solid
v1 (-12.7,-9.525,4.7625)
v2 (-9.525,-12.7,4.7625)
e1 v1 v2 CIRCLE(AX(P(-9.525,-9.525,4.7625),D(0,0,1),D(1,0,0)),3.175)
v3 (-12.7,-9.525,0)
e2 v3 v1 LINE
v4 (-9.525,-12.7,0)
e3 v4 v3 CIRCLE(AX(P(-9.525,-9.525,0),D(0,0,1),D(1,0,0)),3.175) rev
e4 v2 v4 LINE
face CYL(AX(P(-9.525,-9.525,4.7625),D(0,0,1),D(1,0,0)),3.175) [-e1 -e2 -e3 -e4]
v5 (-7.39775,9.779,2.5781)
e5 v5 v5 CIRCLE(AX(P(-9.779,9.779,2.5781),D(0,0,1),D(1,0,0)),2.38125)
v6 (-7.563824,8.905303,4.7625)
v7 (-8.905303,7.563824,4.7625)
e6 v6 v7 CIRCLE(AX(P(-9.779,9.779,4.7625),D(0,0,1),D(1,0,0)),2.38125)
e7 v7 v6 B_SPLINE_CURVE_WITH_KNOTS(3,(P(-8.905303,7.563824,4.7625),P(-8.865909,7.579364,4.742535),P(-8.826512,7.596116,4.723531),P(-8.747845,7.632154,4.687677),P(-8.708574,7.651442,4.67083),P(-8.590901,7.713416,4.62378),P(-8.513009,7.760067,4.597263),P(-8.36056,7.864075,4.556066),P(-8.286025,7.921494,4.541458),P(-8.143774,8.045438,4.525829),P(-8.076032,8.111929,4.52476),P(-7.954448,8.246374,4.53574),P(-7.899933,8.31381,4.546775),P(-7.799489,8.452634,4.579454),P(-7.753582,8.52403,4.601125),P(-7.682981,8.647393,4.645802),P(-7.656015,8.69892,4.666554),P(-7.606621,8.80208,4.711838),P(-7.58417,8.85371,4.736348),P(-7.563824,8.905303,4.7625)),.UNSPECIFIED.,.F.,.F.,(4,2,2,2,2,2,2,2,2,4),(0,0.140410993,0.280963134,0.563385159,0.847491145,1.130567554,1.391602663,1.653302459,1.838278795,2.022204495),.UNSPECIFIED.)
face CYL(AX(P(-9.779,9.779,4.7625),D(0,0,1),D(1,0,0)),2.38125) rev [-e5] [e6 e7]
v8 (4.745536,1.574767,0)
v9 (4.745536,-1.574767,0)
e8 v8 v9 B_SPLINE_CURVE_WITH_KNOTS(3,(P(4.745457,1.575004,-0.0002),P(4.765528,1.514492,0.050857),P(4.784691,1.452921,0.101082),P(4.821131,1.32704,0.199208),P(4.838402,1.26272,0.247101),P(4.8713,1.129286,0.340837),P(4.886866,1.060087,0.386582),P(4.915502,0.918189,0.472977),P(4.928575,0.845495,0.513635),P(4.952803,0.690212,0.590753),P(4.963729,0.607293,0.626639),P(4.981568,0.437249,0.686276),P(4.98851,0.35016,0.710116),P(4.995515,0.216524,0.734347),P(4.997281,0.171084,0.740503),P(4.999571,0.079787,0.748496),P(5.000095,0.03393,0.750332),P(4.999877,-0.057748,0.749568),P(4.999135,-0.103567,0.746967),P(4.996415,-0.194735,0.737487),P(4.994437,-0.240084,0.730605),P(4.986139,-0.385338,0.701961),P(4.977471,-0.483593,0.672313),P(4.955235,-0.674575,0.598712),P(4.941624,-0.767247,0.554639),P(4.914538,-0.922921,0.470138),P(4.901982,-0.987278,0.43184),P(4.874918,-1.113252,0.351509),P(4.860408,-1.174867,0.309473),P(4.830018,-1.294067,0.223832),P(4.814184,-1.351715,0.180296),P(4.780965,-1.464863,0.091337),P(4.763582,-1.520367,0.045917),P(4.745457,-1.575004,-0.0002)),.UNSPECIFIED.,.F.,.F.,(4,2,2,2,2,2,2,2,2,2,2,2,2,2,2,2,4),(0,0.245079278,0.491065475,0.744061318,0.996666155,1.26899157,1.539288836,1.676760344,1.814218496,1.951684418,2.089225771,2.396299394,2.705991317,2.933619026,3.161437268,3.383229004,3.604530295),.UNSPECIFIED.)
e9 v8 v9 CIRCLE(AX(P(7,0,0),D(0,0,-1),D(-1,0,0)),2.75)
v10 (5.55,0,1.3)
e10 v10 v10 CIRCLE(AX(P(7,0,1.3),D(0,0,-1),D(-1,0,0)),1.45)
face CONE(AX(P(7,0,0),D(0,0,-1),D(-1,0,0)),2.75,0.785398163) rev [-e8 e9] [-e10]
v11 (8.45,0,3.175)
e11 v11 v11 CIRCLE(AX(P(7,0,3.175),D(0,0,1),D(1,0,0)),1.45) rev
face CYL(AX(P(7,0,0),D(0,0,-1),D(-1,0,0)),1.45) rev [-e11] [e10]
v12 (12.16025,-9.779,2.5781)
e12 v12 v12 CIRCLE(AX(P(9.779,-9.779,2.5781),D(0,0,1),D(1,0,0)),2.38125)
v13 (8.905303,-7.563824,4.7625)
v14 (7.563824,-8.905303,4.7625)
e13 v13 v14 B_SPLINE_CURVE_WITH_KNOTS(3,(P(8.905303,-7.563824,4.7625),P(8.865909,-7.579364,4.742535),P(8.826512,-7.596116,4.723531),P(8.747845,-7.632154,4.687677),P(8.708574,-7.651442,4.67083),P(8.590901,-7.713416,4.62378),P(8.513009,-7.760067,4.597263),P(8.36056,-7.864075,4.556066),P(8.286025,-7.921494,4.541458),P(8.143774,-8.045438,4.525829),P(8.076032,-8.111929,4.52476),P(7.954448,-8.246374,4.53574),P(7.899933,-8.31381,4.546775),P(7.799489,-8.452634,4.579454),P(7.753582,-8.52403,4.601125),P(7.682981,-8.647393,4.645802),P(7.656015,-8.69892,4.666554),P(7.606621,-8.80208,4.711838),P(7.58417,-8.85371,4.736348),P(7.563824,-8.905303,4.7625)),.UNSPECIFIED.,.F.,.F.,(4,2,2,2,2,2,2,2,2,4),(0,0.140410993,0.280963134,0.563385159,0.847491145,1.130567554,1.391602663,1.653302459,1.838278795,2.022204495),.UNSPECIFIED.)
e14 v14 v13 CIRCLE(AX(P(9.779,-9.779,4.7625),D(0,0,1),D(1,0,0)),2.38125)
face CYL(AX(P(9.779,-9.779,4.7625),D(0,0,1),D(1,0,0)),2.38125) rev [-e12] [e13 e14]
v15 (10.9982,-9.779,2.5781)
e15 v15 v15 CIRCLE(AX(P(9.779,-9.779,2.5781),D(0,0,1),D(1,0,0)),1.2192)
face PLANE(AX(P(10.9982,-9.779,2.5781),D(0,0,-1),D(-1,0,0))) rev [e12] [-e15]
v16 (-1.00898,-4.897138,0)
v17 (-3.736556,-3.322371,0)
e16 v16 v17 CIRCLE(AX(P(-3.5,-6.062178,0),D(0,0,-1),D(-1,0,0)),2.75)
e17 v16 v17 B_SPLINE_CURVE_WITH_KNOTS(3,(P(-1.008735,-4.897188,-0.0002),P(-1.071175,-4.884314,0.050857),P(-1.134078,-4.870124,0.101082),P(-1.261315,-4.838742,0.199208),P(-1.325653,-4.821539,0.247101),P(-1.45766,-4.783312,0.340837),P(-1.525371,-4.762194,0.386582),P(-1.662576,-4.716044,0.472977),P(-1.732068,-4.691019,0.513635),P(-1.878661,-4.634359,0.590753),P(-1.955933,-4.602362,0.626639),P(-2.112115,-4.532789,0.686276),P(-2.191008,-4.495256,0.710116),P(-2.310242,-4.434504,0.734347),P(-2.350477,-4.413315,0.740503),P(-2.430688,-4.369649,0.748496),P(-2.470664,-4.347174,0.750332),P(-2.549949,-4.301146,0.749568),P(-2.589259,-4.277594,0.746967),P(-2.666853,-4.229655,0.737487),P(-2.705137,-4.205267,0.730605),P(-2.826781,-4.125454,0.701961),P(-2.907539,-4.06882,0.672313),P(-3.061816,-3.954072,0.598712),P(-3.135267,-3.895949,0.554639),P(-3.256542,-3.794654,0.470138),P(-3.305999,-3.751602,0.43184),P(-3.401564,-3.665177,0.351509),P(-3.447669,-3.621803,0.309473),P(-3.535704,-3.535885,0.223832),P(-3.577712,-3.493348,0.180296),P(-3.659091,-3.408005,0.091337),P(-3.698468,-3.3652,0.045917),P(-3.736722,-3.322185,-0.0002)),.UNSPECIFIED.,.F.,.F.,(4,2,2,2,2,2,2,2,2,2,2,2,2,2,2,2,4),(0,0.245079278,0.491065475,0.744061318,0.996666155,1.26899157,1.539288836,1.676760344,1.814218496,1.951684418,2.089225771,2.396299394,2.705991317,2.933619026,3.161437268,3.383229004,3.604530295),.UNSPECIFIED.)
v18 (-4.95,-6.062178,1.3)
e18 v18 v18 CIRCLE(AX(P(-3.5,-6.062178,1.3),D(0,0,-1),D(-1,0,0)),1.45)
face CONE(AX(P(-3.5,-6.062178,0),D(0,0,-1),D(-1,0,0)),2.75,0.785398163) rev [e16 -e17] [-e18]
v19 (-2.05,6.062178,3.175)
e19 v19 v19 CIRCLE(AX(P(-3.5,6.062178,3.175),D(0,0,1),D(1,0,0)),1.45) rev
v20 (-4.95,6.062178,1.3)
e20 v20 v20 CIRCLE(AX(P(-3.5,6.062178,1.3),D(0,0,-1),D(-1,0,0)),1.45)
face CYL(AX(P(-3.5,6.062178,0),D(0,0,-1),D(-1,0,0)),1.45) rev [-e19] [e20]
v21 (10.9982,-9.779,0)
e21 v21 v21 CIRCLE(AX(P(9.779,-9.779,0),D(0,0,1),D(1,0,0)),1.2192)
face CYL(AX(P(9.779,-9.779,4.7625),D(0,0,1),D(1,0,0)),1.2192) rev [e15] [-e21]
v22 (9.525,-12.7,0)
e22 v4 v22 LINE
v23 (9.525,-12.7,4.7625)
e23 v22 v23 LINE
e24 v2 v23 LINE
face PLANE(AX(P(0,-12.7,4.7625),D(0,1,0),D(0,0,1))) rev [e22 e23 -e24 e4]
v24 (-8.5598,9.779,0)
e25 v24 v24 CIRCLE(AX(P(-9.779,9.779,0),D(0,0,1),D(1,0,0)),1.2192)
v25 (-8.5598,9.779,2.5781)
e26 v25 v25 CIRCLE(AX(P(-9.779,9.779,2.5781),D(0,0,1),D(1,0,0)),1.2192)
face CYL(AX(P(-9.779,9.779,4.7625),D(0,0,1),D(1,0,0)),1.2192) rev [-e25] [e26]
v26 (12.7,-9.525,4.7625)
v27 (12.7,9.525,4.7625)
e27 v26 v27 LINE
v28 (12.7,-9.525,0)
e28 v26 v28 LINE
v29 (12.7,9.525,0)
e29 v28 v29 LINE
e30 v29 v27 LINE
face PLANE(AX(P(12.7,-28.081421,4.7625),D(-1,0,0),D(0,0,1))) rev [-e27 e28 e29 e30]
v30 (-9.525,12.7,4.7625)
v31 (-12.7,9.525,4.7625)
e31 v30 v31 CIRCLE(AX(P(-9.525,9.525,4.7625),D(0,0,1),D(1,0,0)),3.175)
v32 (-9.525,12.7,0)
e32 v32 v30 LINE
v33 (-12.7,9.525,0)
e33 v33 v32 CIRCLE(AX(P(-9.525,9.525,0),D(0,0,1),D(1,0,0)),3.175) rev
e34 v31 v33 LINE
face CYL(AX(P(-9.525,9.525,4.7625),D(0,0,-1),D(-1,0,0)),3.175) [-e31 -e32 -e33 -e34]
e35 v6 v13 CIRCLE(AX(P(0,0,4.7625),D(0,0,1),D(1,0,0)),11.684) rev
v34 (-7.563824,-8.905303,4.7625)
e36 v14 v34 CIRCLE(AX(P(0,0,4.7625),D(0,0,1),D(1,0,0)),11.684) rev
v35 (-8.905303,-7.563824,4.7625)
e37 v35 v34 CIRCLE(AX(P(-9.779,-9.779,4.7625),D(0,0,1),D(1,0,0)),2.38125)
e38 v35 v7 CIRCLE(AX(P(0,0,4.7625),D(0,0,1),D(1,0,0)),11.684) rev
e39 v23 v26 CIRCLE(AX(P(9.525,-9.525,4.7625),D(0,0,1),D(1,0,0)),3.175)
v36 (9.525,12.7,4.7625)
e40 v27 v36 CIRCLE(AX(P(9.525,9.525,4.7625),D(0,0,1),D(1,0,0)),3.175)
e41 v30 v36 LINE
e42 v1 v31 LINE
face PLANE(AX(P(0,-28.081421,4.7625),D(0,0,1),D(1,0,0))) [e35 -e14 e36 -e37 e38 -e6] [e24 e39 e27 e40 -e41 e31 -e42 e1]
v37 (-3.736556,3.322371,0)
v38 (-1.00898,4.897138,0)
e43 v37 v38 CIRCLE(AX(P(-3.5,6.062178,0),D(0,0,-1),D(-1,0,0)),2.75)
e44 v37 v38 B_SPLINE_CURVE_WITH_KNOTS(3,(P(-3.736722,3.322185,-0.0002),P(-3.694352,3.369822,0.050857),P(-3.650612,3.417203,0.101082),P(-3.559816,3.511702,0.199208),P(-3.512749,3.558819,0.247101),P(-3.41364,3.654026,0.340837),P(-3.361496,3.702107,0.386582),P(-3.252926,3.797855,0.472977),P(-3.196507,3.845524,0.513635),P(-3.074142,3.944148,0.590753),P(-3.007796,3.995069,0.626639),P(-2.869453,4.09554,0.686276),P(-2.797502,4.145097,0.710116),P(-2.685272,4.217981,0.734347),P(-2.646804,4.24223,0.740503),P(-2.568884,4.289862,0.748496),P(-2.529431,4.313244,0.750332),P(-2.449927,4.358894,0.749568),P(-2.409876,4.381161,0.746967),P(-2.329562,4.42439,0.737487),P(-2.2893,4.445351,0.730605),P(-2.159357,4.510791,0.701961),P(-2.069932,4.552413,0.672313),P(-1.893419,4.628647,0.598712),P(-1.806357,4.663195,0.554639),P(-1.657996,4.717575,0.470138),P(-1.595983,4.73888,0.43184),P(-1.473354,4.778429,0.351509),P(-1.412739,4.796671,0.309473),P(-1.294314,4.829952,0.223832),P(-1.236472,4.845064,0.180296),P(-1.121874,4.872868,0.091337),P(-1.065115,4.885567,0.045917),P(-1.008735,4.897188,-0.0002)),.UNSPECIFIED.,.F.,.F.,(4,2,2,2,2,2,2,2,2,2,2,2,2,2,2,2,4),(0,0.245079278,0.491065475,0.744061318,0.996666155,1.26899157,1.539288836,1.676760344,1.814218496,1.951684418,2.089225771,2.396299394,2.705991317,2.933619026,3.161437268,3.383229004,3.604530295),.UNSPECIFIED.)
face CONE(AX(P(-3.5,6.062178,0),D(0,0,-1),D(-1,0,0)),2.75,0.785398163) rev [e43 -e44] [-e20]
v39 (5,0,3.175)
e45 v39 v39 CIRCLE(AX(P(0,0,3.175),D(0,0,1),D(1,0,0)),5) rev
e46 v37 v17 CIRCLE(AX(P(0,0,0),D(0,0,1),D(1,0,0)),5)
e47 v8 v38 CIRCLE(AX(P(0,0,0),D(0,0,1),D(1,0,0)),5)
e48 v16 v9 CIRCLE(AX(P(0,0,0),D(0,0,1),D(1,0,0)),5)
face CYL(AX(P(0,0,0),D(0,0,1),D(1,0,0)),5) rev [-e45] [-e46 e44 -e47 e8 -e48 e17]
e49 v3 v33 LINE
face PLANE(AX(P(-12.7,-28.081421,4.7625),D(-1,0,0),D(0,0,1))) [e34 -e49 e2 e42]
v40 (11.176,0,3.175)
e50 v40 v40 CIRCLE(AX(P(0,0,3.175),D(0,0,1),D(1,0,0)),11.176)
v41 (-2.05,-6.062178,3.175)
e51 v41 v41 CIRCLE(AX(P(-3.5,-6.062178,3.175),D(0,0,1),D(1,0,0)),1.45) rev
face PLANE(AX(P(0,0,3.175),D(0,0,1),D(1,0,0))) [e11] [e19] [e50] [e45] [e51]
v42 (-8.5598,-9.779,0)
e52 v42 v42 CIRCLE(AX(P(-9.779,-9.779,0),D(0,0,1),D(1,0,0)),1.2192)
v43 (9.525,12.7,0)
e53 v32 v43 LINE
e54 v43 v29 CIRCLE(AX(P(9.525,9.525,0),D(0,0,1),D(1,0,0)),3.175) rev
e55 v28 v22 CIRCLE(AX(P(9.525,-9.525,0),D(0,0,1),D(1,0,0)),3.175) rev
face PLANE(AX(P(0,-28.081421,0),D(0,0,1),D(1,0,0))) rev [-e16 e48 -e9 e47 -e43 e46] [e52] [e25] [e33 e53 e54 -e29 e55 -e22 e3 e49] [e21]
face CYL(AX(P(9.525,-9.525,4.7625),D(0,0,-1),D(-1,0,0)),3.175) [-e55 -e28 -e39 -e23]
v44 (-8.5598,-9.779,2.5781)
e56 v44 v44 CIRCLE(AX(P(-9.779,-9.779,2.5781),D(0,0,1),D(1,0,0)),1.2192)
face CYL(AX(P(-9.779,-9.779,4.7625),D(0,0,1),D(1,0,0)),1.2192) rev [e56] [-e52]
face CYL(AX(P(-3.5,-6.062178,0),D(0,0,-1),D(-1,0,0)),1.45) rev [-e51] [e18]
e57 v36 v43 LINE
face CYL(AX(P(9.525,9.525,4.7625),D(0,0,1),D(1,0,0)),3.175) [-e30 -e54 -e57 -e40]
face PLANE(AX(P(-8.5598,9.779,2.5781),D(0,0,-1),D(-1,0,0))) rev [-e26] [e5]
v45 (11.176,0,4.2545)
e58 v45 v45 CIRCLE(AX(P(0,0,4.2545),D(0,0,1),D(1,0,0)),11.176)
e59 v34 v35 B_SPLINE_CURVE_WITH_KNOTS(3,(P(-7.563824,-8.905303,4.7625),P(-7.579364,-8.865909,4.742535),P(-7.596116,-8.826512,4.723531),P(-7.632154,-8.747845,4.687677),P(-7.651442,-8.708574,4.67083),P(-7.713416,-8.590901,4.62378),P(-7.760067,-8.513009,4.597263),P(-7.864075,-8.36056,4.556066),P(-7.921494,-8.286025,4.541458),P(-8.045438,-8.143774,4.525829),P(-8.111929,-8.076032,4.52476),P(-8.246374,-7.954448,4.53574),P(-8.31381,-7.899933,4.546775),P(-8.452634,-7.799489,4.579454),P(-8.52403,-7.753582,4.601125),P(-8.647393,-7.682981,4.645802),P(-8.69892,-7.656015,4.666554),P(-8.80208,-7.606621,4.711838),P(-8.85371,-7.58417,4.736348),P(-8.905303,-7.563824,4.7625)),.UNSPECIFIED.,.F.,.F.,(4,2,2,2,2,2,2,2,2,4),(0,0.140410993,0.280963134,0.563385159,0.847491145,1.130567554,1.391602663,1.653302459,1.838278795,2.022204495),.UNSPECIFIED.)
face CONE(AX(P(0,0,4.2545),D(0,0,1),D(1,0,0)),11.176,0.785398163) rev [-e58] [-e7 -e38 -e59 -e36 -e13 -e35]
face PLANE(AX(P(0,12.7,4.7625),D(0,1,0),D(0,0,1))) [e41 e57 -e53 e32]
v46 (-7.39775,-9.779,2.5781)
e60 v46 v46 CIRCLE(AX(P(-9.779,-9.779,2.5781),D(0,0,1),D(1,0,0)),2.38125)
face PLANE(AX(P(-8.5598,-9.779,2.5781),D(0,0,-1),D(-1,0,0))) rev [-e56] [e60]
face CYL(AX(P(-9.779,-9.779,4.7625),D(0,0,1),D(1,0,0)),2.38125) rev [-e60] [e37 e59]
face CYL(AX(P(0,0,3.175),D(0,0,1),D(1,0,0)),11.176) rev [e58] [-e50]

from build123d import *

# Parameters (mm, degrees)
BOSS_EXTRUDE2_DEPTH                               = 4.7625
SKETCH9_R                                         = 5
CUT_EXTRUDE1_DEPTH                                = 19.581211108
CSK_FOR_M2_5_FLAT_HEAD_MACHINE_SCREW1_D           = 2.9
CSK_FOR_M2_5_FLAT_HEAD_MACHINE_SCREW1_CSINK_D     = 5.5
CSK_FOR_M2_5_FLAT_HEAD_MACHINE_SCREW1_CSINK_ANGLE = 90
CBORE_FOR_2_SOCKET_HEAD_CAP_SCREW1_D              = 2.4384
CBORE_FOR_2_SOCKET_HEAD_CAP_SCREW1_CBORE_D        = 4.7625
CBORE_FOR_2_SOCKET_HEAD_CAP_SCREW1_CBORE_DEPTH    = 2.1844
FILLET1_R                                         = 3.175
CIRPATTERN1_COUNT                                 = 3
SKETCH10_R                                        = 11.176
CUT_EXTRUDE2_DEPTH                                = 1.5875
CHAMFER1_SIZE                                     = 0.508


with BuildPart() as part:
    # Sketch1 → Boss-Extrude2 (new body)
    with BuildSketch(Plane.XY):
        Polygon((12.7, 12.7), (-12.7, 12.7), (0, 0), align=None)
        Polygon((-12.7, 12.7), (-12.7, -12.7), (0, 0), align=None)
        Polygon((0, 0), (-12.7, -12.7), (12.7, -12.7), align=None)
        Polygon((0, 0), (12.7, -12.7), (12.7, 12.7), align=None)
    extrude(amount=BOSS_EXTRUDE2_DEPTH)

    # Sketch9 → Cut-Extrude1 (cut, through all)
    with BuildSketch(Plane.XY.offset(4.7625)):
        Circle(SKETCH9_R)
    extrude(amount=-CUT_EXTRUDE1_DEPTH, mode=Mode.SUBTRACT)

    # CSK for M2.5 Flat Head Machine Screw1 (through all)
    with Locations(Plane(origin=(0, 0, 0), x_dir=(-1, 0, 0), z_dir=(0, 0, -1))):
        with Locations((3.5, 6.062177826)):
            csk_for_m2_5_flat_head_machine_screw1 = CounterSinkHole(CSK_FOR_M2_5_FLAT_HEAD_MACHINE_SCREW1_D / 2, CSK_FOR_M2_5_FLAT_HEAD_MACHINE_SCREW1_CSINK_D / 2, counter_sink_angle=CSK_FOR_M2_5_FLAT_HEAD_MACHINE_SCREW1_CSINK_ANGLE)

    # CBORE for #2 Socket Head Cap Screw1 (through all)
    with Locations(Plane.XY.offset(4.7625)):
        with Locations((0, 0), (-9.779, -9.779), (9.779, -9.779), (-9.779, 9.779)):
            CounterBoreHole(CBORE_FOR_2_SOCKET_HEAD_CAP_SCREW1_D / 2, CBORE_FOR_2_SOCKET_HEAD_CAP_SCREW1_CBORE_D / 2, CBORE_FOR_2_SOCKET_HEAD_CAP_SCREW1_CBORE_DEPTH)

    # Fillet1
    fillet1_edges = [part.edges().sort_by_distance(p)[0] for p in [
        (12.7, 12.7, 2.38125),
        (12.7, -12.7, 2.38125),
        (-12.7, -12.7, 2.38125),
        (-12.7, 12.7, 2.38125),
    ]]
    fillet(fillet1_edges, radius=FILLET1_R)

    # CirPattern1: CSK for M2.5 Flat Head Machine Screw1 ×3 about axis
    cirpattern1_axis = Axis((0, 0, 0), (0, 0, 1))
    for i in range(1, CIRPATTERN1_COUNT):
        add(csk_for_m2_5_flat_head_machine_screw1.rotate(cirpattern1_axis, i * 360 / CIRPATTERN1_COUNT), mode=Mode.SUBTRACT)

    # Sketch10 → Cut-Extrude2 (cut)
    with BuildSketch(Plane.XY.offset(4.7625)):
        Circle(SKETCH10_R)
    extrude(amount=-CUT_EXTRUDE2_DEPTH, mode=Mode.SUBTRACT)

    # Chamfer1
    # the kernel refuses this chamfer: 0.508 mm, written as the material it takes off along each edge
    with BuildSketch(Plane(origin=(0, 0, 4.7625), x_dir=(1, 0, 0), z_dir=(0, -1, 0))) as chamfer1_piece_1:
        Polygon((11.176 + CHAMFER1_SIZE, 0), (11.176, -CHAMFER1_SIZE), (11.176, 0), align=None)
    revolve(axis=Axis((0, 0, 4.7625), (0, 0, 1)), mode=Mode.SUBTRACT)


solid = part.part
